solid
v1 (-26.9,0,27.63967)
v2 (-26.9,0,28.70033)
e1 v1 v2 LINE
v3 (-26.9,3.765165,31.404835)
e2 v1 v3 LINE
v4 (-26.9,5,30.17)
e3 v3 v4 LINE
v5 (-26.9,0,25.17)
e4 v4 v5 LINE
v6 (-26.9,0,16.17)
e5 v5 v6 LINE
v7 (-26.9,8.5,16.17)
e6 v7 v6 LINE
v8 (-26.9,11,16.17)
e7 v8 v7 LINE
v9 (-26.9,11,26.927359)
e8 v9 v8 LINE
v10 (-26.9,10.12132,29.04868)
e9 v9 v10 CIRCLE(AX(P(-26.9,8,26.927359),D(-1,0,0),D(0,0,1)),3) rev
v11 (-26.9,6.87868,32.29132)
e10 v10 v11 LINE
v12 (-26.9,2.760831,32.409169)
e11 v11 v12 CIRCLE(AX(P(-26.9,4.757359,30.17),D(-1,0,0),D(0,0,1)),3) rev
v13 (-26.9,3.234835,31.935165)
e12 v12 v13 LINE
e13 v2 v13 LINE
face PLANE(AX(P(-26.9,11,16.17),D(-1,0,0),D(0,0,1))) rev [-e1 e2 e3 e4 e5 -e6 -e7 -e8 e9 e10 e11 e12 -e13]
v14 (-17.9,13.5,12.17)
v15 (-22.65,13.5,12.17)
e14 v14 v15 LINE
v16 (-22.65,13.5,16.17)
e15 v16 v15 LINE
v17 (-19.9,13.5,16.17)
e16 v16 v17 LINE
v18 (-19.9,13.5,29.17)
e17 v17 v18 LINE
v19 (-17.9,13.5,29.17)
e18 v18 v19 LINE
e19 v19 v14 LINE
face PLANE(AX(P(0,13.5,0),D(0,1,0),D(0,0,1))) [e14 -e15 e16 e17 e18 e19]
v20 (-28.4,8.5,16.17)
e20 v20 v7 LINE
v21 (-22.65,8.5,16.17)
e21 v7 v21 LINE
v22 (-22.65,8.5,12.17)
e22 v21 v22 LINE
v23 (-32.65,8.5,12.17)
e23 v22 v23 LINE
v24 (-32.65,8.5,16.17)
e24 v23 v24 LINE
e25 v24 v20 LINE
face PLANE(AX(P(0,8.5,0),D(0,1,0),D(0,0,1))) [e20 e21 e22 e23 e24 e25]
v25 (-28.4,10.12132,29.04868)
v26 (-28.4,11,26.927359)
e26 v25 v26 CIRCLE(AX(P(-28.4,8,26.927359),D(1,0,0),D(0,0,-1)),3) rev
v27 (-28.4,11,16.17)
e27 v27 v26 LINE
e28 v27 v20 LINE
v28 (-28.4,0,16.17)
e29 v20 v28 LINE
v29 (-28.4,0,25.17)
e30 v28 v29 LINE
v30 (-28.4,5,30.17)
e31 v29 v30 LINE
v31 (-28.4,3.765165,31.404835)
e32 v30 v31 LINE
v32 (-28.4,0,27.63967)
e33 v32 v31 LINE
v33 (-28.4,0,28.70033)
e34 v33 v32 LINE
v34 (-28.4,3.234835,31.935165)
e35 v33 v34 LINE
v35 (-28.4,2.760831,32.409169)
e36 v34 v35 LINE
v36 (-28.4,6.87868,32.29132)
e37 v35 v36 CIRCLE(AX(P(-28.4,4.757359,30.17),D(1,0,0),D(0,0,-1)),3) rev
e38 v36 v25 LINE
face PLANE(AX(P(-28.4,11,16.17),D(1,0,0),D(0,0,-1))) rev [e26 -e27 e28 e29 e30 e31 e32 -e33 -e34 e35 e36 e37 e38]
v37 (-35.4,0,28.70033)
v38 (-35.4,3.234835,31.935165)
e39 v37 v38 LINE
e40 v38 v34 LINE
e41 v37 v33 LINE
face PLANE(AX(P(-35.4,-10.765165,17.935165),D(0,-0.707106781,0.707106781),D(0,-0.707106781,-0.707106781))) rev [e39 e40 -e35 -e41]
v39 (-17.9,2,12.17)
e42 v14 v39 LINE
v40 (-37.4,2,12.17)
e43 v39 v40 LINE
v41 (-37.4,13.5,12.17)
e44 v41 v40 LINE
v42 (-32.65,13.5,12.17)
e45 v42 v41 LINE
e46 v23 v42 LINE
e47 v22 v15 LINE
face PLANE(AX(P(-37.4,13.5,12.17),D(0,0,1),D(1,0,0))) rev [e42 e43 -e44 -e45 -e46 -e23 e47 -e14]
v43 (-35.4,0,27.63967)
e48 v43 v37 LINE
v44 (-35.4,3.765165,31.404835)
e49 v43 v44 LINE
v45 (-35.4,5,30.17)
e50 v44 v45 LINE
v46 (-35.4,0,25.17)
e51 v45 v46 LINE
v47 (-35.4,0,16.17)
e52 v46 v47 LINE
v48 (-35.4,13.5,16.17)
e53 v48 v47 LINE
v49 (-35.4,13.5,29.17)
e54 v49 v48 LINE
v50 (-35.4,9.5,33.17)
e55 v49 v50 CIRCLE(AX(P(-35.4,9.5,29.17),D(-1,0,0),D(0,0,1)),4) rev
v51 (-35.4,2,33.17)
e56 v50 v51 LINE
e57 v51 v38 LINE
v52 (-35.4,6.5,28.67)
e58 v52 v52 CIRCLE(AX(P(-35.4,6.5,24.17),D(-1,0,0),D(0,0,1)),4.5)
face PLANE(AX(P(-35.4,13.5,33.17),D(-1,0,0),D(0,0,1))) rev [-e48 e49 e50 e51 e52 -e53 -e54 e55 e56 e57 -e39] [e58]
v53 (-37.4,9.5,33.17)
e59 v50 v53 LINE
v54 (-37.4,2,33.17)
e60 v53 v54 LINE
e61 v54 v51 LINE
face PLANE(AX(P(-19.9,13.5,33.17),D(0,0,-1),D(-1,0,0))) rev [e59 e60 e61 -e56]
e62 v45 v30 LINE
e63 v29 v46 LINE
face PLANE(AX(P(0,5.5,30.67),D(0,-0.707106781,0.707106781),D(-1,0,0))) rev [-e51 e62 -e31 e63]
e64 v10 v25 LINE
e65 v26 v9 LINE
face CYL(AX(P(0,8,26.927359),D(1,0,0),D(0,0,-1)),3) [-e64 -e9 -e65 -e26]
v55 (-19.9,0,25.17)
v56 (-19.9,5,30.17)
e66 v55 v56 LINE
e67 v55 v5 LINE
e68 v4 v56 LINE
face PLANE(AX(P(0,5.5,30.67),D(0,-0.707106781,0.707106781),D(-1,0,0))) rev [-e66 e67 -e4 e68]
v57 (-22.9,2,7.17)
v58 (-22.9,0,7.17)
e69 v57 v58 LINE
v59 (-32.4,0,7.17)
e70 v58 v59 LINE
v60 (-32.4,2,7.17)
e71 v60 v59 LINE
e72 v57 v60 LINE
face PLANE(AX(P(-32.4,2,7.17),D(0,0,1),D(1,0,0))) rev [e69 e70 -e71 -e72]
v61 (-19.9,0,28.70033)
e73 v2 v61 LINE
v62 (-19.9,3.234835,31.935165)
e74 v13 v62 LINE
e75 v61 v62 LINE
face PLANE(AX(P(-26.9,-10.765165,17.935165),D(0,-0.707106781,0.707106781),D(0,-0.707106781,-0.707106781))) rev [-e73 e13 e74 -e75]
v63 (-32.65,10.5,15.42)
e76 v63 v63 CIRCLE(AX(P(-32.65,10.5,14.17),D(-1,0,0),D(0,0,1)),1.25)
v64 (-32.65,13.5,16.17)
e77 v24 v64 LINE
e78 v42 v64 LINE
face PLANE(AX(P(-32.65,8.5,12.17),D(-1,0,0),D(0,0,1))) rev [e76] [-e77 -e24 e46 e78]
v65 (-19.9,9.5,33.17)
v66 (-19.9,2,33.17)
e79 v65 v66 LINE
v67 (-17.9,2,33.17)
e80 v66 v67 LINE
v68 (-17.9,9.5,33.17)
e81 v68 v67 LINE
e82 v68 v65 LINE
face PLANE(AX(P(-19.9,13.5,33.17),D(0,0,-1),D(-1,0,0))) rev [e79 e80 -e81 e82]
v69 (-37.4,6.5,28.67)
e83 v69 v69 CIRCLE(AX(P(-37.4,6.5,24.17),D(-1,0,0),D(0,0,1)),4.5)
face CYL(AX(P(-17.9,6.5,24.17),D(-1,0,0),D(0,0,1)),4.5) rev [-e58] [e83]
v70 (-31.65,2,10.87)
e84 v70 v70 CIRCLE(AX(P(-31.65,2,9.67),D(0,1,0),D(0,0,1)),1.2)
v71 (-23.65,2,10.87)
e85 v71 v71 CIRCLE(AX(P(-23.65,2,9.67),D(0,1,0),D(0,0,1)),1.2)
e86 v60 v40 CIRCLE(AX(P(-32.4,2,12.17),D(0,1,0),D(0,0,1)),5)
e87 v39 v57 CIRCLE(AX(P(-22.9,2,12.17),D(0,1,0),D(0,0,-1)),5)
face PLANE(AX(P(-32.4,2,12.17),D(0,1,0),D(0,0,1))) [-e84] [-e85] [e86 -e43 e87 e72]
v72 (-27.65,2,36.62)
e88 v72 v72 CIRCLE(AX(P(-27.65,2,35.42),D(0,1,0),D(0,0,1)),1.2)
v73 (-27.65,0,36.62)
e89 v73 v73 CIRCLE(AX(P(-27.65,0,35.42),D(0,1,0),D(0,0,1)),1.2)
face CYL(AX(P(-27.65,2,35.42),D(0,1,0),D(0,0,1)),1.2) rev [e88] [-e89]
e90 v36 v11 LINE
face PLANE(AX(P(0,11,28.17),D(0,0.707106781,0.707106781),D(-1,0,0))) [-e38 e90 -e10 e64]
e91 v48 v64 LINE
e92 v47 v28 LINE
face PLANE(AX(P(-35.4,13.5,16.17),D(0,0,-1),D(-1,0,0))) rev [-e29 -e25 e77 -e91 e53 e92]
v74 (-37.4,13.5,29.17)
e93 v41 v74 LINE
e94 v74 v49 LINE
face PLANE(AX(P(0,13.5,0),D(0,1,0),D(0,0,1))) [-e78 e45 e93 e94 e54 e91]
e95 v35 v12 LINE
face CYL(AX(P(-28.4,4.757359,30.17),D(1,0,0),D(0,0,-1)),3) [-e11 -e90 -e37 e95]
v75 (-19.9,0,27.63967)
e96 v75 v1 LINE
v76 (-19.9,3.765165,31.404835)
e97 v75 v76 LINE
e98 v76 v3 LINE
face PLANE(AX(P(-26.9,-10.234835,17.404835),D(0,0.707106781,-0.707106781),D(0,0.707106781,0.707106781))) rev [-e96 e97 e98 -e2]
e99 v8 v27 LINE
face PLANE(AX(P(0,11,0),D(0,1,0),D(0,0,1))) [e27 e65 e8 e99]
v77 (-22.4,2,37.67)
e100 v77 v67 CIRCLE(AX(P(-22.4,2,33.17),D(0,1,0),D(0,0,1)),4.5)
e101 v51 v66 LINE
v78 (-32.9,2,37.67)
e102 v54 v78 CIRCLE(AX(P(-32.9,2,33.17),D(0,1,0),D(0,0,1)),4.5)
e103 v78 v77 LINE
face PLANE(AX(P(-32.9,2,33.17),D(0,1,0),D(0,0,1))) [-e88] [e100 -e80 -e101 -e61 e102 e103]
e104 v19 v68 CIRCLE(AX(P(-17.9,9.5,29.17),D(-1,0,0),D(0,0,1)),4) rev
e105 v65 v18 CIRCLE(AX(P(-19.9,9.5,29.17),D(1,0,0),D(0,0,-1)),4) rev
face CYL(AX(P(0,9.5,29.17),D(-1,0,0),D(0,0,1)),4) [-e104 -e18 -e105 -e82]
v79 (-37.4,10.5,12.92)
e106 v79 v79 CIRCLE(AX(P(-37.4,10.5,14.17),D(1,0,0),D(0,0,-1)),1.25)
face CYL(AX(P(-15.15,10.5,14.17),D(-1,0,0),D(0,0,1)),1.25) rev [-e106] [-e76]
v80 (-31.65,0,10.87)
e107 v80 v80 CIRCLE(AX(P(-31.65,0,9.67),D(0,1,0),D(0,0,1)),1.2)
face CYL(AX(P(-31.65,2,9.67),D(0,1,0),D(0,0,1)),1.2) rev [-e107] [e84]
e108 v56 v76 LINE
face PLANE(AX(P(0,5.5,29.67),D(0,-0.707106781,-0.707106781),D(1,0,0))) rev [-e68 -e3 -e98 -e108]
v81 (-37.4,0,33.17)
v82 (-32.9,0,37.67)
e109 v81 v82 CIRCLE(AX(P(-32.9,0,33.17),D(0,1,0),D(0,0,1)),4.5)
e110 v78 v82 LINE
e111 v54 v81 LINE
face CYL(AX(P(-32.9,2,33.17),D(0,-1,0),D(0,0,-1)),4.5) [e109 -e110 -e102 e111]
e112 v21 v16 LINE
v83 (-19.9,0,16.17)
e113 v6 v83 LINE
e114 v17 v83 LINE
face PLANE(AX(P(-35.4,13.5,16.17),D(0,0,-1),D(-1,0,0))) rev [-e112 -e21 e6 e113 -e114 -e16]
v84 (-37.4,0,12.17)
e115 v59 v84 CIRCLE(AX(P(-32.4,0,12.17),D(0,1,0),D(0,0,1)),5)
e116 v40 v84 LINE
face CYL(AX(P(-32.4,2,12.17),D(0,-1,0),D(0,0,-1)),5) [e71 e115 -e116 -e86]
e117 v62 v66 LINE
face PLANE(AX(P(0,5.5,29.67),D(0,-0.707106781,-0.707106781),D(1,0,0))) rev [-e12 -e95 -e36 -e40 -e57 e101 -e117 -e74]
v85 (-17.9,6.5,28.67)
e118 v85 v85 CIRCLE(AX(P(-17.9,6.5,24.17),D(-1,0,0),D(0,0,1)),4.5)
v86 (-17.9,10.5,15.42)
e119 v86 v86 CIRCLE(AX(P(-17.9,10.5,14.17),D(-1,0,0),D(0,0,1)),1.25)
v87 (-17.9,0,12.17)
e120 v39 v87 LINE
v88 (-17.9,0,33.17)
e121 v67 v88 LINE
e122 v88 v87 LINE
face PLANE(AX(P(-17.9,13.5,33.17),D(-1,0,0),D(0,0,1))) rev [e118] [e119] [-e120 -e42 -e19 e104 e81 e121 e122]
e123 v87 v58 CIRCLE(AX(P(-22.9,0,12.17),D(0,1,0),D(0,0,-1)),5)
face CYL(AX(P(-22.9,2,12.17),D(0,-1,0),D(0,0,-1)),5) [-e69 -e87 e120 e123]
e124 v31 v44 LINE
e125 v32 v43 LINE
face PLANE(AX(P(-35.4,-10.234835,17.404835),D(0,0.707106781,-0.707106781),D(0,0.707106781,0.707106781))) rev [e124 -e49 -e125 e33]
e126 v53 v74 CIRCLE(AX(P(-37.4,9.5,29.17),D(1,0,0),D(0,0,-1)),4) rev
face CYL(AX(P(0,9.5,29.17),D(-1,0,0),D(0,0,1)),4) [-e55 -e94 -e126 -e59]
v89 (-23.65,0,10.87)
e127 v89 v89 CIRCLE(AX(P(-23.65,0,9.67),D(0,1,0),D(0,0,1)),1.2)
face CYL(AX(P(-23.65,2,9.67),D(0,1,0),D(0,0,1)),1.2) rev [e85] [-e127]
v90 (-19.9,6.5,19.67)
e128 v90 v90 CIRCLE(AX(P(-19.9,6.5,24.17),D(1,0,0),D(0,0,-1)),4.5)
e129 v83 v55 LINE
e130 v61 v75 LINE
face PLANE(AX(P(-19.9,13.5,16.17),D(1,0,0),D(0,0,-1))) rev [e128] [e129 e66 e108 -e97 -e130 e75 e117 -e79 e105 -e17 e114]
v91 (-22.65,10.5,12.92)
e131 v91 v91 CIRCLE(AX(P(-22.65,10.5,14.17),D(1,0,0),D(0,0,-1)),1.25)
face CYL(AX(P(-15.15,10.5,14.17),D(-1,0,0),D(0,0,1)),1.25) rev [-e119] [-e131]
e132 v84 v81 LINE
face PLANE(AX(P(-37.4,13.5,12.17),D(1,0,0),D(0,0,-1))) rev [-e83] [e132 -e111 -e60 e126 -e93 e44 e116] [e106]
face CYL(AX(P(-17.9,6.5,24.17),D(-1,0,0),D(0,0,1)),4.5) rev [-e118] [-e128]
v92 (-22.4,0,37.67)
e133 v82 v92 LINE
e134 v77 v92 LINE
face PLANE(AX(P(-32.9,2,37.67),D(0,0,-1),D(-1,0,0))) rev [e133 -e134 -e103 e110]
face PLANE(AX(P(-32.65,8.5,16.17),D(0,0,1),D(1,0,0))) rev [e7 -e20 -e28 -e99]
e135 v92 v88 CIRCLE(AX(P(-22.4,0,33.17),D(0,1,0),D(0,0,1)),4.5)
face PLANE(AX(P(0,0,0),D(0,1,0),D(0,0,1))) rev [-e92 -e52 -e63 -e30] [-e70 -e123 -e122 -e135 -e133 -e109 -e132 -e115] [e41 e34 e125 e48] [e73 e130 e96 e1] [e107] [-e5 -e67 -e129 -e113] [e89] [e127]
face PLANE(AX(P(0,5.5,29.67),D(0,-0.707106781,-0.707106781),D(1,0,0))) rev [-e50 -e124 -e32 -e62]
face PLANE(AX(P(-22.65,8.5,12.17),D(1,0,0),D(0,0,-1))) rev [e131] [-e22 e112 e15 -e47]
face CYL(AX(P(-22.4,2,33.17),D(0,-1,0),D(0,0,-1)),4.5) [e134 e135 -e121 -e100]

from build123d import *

# Parameters (mm, degrees)
BOSS_EXTRUDE7_DEPTH  = 13.5
SKETCH22_R           = 4.5
CUT_EXTRUDE4_DEPTH   = 41.776818177
SKETCH9_W            = 1.5
SKETCH9_H            = 17
BOSS_EXTRUDE8_DEPTH  = 11
BOSS_EXTRUDE9_DEPTH  = 2
FILLET1_R            = 4
SKETCH11_W           = 10
SKETCH11_H           = 4
CUT_EXTRUDE1_DEPTH   = 5
CHAMFER2_SIZE        = 5
FILLET2_R            = 3
SKETCH12_R           = 1.25
CUT_EXTRUDE2_DEPTH   = 12.5
M2_CLEARANCE_HOLE1_D = 2.4
BOSS_EXTRUDE10_DEPTH = 2
M2_CLEARANCE_HOLE2_D = 2.4
SKETCH20_W           = 15.5
SKETCH20_H           = 8
BOSS_EXTRUDE11_DEPTH = 5.5
CHAMFER3_SIZE        = 5.5
CHAMFER4_START       = -35.400000065
CHAMFER4_DEPTH       = 7
CHAMFER4_START_2     = -26.900000065
CHAMFER4_2_DEPTH     = 7
CHAMFER4_START_3     = -28.400000065
CHAMFER4_3_DEPTH     = 1.5
SKETCH21_W           = 7
SKETCH21_H           = 0.75
CUT_EXTRUDE3_DEPTH   = 46.949966868
LPATTERN1_COUNT      = 2
LPATTERN1_PITCH      = 8.5


with BuildPart() as part:
    # Sketch8 → Boss-Extrude7 (new body)
    with BuildSketch(Plane(origin=(0, 0, 0), x_dir=(1, 0, 0), z_dir=(0, 1, 0))):
        Polygon((-37.400000065, -12.17000001), (-37.400000065, -33.17000001), (-35.400000065, -33.17000001), (-35.400000065, -16.17000001), (-19.900000065, -16.17000001), (-19.900000065, -33.17000001), (-17.900000065, -33.17000001), (-17.900000065, -12.17000001), align=None)
    extrude(amount=BOSS_EXTRUDE7_DEPTH)

    # Sketch22 → Cut-Extrude4 (cut, through all)
    with BuildSketch(Plane.ZY.offset(37.400000065)):
        with Locations((24.17000001, 6.5)):
            Circle(SKETCH22_R)
    extrude(amount=-CUT_EXTRUDE4_DEPTH, mode=Mode.SUBTRACT)

    # Sketch9 → Boss-Extrude8 (add)
    with BuildSketch(Plane(origin=(0, 0, 0), x_dir=(1, 0, 0), z_dir=(0, 1, 0))):
        with Locations((-27.650000065, -24.67000001)):
            Rectangle(SKETCH9_W, SKETCH9_H)
    extrude(amount=BOSS_EXTRUDE8_DEPTH)

    # Sketch10 → Boss-Extrude9 (add)
    with BuildSketch(Plane(origin=(0, 0, 0), x_dir=(1, 0, 0), z_dir=(0, 1, 0))):
        with BuildLine():
            Line((-37.400000065, -30.17000001), (-17.900000065, -30.17000001))
            Line((-17.900000065, -30.17000001), (-17.900000065, -33.17000001))
            ThreePointArc((-17.900000065, -33.17000001), (-19.218019549, -36.351980525), (-22.400000065, -37.67000001))
            Line((-22.400000065, -37.67000001), (-32.900000065, -37.67000001))
            ThreePointArc((-32.900000065, -37.67000001), (-36.08198058, -36.351980525), (-37.400000065, -33.17000001))
            Line((-37.400000065, -33.17000001), (-37.400000065, -30.17000001))
        make_face()
    extrude(amount=BOSS_EXTRUDE9_DEPTH)

    # Fillet1
    fillet1_edges = [part.edges().sort_by_distance(p)[0] for p in [
        (-36.400000065, 13.5, 33.17000001),
        (-18.900000065, 13.5, 33.17000001),
    ]]
    fillet(fillet1_edges, radius=FILLET1_R)

    # Sketch11 → Cut-Extrude1 (cut)
    with BuildSketch(Plane(origin=(0, 13.5, 0), x_dir=(1, 0, 0), z_dir=(0, 1, 0))):
        with Locations((-27.650000065, -14.17000001)):
            Rectangle(SKETCH11_W, SKETCH11_H)
    extrude(amount=-CUT_EXTRUDE1_DEPTH, mode=Mode.SUBTRACT)

    # Chamfer2
    chamfer2_edges = [part.edges().sort_by_distance(p)[0] for p in [
        (-27.650000065, 11, 33.17000001),
    ]]
    chamfer(chamfer2_edges, length=CHAMFER2_SIZE)

    # Fillet2
    fillet2_edges = [part.edges().sort_by_distance(p)[0] for p in [
        (-27.650000065, 11, 28.17000001),
        (-27.650000065, 6, 33.17000001),
    ]]
    fillet(fillet2_edges, radius=FILLET2_R)

    # Sketch12 → Cut-Extrude2 (cut, symmetric)
    with BuildSketch(Plane.ZY.offset(27.650000065)):
        with Locations((14.17000001, 10.5)):
            Circle(SKETCH12_R)
    extrude(amount=CUT_EXTRUDE2_DEPTH, both=True, mode=Mode.SUBTRACT)

    # M2 Clearance Hole1 (through all)
    with Locations(Plane(origin=(-27.650000065, 2, 35.42000001), x_dir=(0, 0, 1), z_dir=(0, 1, 0))):
        with Locations((0, 0)):
            Hole(M2_CLEARANCE_HOLE1_D / 2)

    # Sketch17 → Boss-Extrude10 (add)
    with BuildSketch(Plane(origin=(0, 0, 0), x_dir=(1, 0, 0), z_dir=(0, 1, 0))):
        with BuildLine():
            Line((-32.400000065, -7.17000001), (-22.900000065, -7.17000001))
            ThreePointArc((-22.900000065, -7.17000001), (-19.364466159, -8.634466104), (-17.900000065, -12.17000001))
            Line((-17.900000065, -12.17000001), (-17.900000065, -14.17000001))
            Line((-17.900000065, -14.17000001), (-37.400000065, -14.17000001))
            Line((-37.400000065, -14.17000001), (-37.400000065, -12.17000001))
            ThreePointArc((-37.400000065, -12.17000001), (-35.935533971, -8.634466104), (-32.400000065, -7.17000001))
        make_face()
    extrude(amount=BOSS_EXTRUDE10_DEPTH)

    # M2 Clearance Hole2 (through all)
    with Locations(Plane(origin=(-31.650000065, 2, 9.67000001), x_dir=(0, 0, 1), z_dir=(0, 1, 0))):
        with Locations((0, 0), (0, 8)):
            Hole(M2_CLEARANCE_HOLE2_D / 2)

    # Sketch20 → Boss-Extrude11 (add)
    with BuildSketch(Plane(origin=(0, 0, 0), x_dir=(1, 0, 0), z_dir=(0, 1, 0))):
        with Locations((-27.650000065, -29.17000001)):
            Rectangle(SKETCH20_W, SKETCH20_H)
    extrude(amount=BOSS_EXTRUDE11_DEPTH)

    # Chamfer3
    # the kernel refuses this chamfer: 5.5 mm, written as the material it takes off along each edge
    with BuildSketch(Plane(origin=(-14.255743631, 5.5, 25.17000001), x_dir=(0, 0, 1), z_dir=(-1, 0, 0))) as chamfer3_piece_1_section:
        Polygon((CHAMFER3_SIZE, 0), (0, -CHAMFER3_SIZE), (0, 0), align=None)
    chamfer3_piece_1 = extrude(amount=35.288512868, mode=Mode.PRIVATE)
    chamfer3_piece_1 = split(chamfer3_piece_1, bisect_by=Plane(origin=(-26.900000065, 5.5, 25.17000001), z_dir=(1, 0, 0)), keep=Keep.TOP, mode=Mode.PRIVATE)
    chamfer3_piece_1 = split(chamfer3_piece_1, bisect_by=Plane(origin=(-19.900000065, 5.5, 25.17000001), z_dir=(-1, 0, 0)), keep=Keep.TOP, mode=Mode.PRIVATE)
    add(chamfer3_piece_1, mode=Mode.SUBTRACT)
    with BuildSketch(Plane(origin=(-28.400000065, 5.5, 25.17000001), x_dir=(0, 0, 1), z_dir=(-1, 0, 0)), Plane(origin=(-19.900000065, 5.5, 25.17000001), x_dir=(0, 0, 1), z_dir=(-1, 0, 0))) as chamfer3_piece_2:
        Polygon((CHAMFER3_SIZE, 0), (0, -CHAMFER3_SIZE), (0, 0), align=None)
    extrude(amount=7, mode=Mode.SUBTRACT)
    with BuildSketch(Plane(origin=(-5.755743631, 5.5, 25.17000001), x_dir=(0, 0, 1), z_dir=(-1, 0, 0))) as chamfer3_piece_3_section:
        Polygon((CHAMFER3_SIZE, 0), (0, -CHAMFER3_SIZE), (0, 0), align=None)
    chamfer3_piece_3 = extrude(amount=35.288512868, mode=Mode.PRIVATE)
    chamfer3_piece_3 = split(chamfer3_piece_3, bisect_by=Plane(origin=(-28.400000065, 5.5, 25.17000001), z_dir=(-1, 0, 0)), keep=Keep.TOP, mode=Mode.PRIVATE)
    chamfer3_piece_3 = split(chamfer3_piece_3, bisect_by=Plane(origin=(-35.400000065, 5.5, 25.17000001), z_dir=(1, 0, 0)), keep=Keep.TOP, mode=Mode.PRIVATE)
    add(chamfer3_piece_3, mode=Mode.SUBTRACT)

    # Chamfer4: read off the stored shape, not the designer's step
    # Chamfer4 outline → Chamfer4 (cut)
    with BuildSketch(Plane.YZ.offset(CHAMFER4_START)):
        Polygon((5.5, 30.67000001), (5.5, 33.17000001), (2, 33.17000001), (5, 30.17000001), align=None)
    extrude(amount=CHAMFER4_DEPTH, mode=Mode.SUBTRACT)

    # Chamfer4 2 outline → Chamfer4 2 (cut)
    with BuildSketch(Plane.YZ.offset(CHAMFER4_START_2)):
        Polygon((5.5, 30.67000001), (5.5, 33.17000001), (2, 33.17000001), (5, 30.17000001), align=None)
    extrude(amount=CHAMFER4_2_DEPTH, mode=Mode.SUBTRACT)

    # Chamfer4 3 outline → Chamfer4 3 (cut)
    with BuildSketch(Plane.YZ.offset(CHAMFER4_START_3)):
        with BuildLine():
            ThreePointArc((4.757359313, 33.17000001), (5.131603073, 33.146565415), (5.5, 33.076627748))
            Line((5.5, 33.076627748), (5.5, 33.17000001))
            Line((5.5, 33.17000001), (4.757359313, 33.17000001))
        make_face()
        with BuildLine():
            ThreePointArc((2.760831368, 32.409168642), (3.689067662, 32.973346751), (4.757359313, 33.17000001))
            Line((4.757359313, 33.17000001), (2, 33.17000001))
            Line((2, 33.17000001), (2.760831368, 32.409168642))
        make_face()
    extrude(amount=CHAMFER4_3_DEPTH, mode=Mode.SUBTRACT)

    # Sketch21 → Cut-Extrude3 (cut, through all)
    with BuildSketch(Plane(origin=(0, 17.585000005, 17.585000005), x_dir=(1, 0, 0), z_dir=(0, 0.7071067811865511, 0.707106781186544))):
        with Locations((-31.900000065, -19.919198033)):
            Rectangle(SKETCH21_W, SKETCH21_H)
    cut_extrude3 = extrude(amount=-CUT_EXTRUDE3_DEPTH, mode=Mode.SUBTRACT)

    # LPattern1: Cut-Extrude3 ×2
    with Locations(*[(i * LPATTERN1_PITCH, 0, 0) for i in range(1, LPATTERN1_COUNT)]):
        add(cut_extrude3, mode=Mode.SUBTRACT)


solid = part.part
